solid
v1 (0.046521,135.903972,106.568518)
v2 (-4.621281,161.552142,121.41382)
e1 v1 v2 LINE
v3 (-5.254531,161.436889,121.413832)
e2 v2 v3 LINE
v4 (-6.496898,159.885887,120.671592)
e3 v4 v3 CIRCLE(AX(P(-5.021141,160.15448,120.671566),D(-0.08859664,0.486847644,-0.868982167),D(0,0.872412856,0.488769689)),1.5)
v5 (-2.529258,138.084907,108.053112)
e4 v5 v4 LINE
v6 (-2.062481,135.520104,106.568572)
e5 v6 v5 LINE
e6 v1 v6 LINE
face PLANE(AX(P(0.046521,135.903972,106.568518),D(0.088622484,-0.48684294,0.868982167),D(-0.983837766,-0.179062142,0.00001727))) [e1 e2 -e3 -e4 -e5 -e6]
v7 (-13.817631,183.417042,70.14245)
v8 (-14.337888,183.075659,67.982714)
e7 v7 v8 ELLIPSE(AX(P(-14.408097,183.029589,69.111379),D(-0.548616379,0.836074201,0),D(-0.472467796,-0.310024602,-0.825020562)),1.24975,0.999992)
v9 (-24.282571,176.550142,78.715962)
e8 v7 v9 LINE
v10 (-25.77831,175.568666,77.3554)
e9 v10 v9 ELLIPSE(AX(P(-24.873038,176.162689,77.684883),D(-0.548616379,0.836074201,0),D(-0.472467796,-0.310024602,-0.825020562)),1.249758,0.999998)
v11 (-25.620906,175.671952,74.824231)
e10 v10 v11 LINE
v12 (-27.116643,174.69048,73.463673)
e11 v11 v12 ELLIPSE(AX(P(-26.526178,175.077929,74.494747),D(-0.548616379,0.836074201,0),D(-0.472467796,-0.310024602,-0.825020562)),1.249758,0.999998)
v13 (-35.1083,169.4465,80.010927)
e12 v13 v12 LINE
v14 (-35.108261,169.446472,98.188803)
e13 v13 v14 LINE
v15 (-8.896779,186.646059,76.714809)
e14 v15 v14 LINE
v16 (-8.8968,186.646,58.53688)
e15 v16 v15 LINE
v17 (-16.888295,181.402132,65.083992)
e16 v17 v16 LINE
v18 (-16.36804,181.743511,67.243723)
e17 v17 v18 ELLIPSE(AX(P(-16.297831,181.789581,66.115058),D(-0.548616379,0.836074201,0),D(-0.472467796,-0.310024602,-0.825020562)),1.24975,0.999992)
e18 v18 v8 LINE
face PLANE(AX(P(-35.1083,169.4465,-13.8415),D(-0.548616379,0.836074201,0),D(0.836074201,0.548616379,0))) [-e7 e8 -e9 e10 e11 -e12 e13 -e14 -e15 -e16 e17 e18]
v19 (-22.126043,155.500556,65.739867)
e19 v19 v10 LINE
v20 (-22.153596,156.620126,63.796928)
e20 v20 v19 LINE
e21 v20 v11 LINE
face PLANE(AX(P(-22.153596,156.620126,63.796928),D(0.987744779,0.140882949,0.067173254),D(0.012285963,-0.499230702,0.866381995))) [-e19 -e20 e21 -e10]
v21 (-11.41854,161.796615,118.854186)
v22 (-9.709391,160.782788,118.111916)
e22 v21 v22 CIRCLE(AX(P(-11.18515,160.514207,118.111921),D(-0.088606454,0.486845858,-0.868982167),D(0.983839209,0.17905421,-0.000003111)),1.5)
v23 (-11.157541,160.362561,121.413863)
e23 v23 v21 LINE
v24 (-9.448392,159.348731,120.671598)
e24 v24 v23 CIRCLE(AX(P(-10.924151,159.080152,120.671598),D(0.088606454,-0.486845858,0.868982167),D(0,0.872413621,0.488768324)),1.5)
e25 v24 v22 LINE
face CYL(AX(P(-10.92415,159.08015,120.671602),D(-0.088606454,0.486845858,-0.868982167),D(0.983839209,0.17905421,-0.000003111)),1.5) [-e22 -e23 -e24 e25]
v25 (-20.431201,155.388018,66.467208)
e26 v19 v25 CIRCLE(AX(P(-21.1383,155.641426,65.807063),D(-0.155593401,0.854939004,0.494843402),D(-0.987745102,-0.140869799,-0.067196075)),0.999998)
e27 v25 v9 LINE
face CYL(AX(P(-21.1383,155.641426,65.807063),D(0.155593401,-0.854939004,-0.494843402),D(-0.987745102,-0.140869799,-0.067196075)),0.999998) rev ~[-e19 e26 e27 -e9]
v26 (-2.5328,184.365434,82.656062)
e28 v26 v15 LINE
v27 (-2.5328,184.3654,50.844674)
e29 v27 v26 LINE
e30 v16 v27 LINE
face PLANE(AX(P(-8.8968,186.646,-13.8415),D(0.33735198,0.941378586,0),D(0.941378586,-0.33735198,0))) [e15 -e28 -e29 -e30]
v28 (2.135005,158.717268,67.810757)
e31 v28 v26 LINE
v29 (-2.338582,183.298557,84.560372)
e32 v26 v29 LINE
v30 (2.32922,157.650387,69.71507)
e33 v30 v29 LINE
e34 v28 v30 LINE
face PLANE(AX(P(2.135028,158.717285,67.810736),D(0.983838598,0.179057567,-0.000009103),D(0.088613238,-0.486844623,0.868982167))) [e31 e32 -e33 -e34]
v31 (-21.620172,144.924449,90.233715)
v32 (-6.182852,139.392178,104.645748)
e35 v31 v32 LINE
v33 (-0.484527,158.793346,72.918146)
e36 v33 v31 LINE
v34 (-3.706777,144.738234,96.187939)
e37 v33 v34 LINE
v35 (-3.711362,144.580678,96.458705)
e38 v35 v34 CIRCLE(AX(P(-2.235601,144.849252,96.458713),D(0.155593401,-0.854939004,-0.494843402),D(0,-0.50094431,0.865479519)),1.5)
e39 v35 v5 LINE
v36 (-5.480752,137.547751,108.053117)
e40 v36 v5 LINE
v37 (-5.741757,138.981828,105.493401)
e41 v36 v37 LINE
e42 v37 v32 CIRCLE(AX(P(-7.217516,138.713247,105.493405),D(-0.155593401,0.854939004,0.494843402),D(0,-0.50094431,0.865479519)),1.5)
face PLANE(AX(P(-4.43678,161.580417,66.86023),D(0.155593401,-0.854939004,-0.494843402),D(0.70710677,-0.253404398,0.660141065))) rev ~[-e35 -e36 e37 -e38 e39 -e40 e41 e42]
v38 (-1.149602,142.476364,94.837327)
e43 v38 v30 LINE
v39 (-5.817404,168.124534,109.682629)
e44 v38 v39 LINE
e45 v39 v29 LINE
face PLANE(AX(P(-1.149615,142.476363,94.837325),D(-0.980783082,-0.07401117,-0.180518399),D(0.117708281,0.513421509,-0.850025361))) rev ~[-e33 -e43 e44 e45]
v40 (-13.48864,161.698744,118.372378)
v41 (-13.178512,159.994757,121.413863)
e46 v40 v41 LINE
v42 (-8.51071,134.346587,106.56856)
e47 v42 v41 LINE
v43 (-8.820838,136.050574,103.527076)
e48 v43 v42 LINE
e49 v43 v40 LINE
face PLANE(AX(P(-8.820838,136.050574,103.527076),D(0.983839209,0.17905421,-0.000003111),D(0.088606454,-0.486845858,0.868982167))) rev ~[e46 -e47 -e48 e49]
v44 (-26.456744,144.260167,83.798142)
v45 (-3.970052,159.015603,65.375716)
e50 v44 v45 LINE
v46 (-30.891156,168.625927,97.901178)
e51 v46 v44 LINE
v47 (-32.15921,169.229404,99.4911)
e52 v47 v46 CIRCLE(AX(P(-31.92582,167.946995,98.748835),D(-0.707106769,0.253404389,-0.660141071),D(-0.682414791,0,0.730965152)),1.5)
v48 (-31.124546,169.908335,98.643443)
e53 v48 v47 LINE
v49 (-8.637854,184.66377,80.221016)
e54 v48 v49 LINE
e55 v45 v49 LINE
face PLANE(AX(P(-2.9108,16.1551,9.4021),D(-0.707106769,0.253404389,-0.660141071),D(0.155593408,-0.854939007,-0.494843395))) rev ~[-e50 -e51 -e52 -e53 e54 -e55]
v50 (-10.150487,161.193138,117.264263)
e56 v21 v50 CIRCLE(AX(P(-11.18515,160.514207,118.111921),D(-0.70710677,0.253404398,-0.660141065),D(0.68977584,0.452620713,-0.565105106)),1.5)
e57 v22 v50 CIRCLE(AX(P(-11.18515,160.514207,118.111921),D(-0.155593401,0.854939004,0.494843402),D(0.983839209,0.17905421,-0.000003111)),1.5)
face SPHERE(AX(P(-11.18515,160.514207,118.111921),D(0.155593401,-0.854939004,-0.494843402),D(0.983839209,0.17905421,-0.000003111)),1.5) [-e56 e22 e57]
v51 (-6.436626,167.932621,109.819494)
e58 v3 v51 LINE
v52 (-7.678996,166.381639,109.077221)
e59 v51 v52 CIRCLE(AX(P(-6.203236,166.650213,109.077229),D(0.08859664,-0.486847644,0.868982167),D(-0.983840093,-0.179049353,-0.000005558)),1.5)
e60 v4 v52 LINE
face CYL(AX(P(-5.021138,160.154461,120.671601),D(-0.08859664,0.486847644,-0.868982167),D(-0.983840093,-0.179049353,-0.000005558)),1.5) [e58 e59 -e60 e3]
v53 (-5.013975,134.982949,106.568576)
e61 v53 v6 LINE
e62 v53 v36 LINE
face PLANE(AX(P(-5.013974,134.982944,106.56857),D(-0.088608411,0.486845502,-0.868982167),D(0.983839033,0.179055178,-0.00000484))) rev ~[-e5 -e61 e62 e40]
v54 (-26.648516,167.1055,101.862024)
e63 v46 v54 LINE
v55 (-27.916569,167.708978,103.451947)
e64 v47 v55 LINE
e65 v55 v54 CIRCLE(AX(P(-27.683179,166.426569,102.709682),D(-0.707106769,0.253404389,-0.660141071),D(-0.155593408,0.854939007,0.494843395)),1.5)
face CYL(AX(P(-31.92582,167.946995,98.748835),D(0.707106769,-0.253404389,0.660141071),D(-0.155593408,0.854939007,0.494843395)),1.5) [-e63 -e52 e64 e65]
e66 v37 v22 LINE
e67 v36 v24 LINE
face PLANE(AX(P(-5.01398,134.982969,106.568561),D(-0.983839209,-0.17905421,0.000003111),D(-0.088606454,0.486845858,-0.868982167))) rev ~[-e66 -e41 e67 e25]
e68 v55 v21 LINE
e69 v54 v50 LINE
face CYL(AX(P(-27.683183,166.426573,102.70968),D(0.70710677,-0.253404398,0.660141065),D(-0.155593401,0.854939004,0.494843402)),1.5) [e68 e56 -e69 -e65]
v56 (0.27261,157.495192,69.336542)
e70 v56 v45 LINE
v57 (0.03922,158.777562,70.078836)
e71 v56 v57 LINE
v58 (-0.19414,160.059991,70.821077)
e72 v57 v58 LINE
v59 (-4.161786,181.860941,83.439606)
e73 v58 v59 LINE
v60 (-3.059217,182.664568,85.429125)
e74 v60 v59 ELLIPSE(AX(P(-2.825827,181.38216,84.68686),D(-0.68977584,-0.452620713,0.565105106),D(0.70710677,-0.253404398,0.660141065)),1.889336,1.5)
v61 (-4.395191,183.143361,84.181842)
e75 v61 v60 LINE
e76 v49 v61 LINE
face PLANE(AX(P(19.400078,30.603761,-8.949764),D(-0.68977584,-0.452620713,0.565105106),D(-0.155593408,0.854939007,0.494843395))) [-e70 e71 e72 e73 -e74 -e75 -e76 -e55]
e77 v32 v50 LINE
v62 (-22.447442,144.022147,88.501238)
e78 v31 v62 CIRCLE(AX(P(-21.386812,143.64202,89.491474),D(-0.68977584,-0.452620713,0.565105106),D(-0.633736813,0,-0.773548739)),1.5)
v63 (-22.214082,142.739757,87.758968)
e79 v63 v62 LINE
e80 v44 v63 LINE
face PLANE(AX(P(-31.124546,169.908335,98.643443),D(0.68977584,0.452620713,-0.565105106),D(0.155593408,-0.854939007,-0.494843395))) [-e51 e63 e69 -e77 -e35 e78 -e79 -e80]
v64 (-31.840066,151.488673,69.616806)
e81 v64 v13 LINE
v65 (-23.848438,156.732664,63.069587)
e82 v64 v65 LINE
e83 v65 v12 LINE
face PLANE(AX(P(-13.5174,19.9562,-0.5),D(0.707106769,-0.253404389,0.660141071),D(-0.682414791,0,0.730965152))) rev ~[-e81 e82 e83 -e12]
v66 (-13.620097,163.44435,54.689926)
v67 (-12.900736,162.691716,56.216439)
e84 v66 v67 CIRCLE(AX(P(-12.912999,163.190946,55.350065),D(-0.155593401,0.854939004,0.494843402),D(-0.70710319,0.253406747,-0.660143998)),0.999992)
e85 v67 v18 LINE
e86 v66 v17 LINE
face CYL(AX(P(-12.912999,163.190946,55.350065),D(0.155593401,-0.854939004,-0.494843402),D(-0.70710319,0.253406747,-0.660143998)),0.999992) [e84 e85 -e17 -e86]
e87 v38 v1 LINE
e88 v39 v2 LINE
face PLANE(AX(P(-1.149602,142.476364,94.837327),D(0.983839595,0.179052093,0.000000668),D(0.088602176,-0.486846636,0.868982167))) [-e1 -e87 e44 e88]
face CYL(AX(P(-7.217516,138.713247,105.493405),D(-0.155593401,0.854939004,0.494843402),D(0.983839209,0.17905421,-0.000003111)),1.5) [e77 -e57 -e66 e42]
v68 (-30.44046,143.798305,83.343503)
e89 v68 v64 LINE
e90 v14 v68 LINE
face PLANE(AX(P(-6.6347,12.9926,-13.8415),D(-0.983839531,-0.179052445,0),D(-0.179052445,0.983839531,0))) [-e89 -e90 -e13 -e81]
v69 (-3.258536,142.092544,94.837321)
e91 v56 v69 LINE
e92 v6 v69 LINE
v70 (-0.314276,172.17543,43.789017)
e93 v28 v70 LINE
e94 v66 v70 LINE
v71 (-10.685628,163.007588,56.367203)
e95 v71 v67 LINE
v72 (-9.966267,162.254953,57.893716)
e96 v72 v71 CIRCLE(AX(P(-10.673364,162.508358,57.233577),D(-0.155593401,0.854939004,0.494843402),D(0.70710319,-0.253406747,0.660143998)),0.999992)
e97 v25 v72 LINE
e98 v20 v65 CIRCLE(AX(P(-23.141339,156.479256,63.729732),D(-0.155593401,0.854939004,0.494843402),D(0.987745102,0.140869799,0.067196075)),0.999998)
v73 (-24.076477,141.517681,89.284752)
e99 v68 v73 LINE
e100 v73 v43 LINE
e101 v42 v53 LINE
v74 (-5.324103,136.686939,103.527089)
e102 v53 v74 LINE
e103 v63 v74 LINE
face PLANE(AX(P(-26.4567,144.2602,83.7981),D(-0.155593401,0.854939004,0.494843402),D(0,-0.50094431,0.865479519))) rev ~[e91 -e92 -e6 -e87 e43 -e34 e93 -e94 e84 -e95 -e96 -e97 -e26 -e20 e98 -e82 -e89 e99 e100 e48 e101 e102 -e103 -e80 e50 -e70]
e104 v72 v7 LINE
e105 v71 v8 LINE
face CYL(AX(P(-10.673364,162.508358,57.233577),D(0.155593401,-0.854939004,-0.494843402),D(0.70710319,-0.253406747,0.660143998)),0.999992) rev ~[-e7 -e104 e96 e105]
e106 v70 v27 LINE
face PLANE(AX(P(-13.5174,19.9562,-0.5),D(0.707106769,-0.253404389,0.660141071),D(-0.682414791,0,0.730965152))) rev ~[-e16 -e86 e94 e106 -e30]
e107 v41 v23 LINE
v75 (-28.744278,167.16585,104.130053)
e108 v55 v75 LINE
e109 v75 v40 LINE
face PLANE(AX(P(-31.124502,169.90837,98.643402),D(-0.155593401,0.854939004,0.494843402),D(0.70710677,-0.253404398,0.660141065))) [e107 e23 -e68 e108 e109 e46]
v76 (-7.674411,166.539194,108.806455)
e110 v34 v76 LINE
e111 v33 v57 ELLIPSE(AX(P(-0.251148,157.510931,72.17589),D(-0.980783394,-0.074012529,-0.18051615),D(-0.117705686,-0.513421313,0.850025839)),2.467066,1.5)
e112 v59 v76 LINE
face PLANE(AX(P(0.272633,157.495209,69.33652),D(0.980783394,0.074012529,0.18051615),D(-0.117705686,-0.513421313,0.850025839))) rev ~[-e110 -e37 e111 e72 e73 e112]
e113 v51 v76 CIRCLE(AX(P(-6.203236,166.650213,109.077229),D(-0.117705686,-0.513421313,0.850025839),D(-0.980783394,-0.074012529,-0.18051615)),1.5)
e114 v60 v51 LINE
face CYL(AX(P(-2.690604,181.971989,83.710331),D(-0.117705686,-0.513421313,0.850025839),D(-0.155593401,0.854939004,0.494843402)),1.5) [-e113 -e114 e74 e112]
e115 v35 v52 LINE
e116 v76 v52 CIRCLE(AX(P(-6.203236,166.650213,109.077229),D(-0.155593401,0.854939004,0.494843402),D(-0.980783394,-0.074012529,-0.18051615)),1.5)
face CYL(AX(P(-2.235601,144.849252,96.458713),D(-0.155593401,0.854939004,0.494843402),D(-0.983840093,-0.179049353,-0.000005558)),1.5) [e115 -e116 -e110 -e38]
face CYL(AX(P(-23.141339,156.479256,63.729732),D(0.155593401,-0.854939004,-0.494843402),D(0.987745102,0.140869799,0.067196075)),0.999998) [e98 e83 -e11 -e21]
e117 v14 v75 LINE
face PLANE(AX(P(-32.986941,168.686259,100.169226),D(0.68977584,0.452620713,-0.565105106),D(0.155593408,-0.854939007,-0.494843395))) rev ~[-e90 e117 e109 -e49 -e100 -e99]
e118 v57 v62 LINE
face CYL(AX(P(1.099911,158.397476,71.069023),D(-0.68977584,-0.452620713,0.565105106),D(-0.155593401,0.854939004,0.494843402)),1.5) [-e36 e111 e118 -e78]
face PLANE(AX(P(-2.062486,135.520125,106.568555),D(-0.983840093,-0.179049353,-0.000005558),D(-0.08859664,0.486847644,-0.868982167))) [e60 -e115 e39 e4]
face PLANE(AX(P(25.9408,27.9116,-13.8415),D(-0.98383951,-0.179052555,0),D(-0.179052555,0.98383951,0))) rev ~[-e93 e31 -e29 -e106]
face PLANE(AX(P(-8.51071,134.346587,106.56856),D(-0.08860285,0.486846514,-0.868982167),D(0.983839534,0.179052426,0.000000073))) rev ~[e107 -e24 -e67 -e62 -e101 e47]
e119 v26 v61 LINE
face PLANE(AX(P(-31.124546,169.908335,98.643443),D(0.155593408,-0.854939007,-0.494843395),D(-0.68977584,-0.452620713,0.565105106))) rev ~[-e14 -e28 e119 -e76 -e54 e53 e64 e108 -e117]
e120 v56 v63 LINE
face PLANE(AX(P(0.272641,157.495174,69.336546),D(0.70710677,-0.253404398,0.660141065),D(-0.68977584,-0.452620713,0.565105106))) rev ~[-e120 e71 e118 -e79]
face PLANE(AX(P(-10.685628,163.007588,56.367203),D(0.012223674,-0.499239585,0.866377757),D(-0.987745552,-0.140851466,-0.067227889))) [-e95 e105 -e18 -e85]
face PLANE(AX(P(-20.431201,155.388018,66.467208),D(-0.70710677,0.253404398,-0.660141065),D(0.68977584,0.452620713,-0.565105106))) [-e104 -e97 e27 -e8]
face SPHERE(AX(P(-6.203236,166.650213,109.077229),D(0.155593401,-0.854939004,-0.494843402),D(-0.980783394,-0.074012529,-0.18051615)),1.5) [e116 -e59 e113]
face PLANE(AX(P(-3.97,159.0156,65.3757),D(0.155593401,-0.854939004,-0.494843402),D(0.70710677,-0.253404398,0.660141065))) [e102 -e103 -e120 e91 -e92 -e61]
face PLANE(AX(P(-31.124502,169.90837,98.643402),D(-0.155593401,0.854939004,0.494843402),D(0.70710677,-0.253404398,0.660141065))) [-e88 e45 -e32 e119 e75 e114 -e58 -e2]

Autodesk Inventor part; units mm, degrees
sketch3d "3D Sketch1"
ref_plane "Work Plane1" through (-0.0056, 14.7303, 11.9873) normal (-1, 0, 0) x (0, 0, -1)
ref_plane "Work Plane2" through (-2.9108, 16.1551, 9.4021) normal (-0.7071068, 0.2534044, -0.6601411) x (0.1555934, -0.854939, -0.4948434)
sketch "Sketch2" plane through (-2.9108, 16.1551, 9.4021) normal (-0.7071068, 0.2534044, -0.6601411) x (0.1555934, -0.854939, -0.4948434)
  line L0 (-180, 0) -> (0, 0)
  line L1 (0, 0) -> (0, -32)
  line L2 (0, -32) -> (-180, -32)
  line L3 (-180, -32) -> (-180, 0)
  line L4 (3, -35) -> (-180, -35)
  line L5 (-180, -35) -> (-180, 3)
  line L6 (-180, 3) -> (3, 3)
  line L7 (3, 3) -> (3, -35)
  line L8 (-180, 0.3) -> (0.2, 0.3)
  line L9 (0.2, 0.3) -> (0.2, -32.3)
  line L10 (0.2, -32.3) -> (-180, -32.3)
  line L11 (-180, -32.3) -> (-180, 0.3)
  point P0 (-180, 0)
  dimension "d1" = 180
  dimension "d2" = 32
  dimension "d5" = 3
  dimension "d6" = 3
  dimension "d7" = 3
  dimension "d13" = 0.2
  dimension "d14" = 0.3
  dimension "d15" = 0.3
extrude "Extrusion1" add sketch "Sketch2" along normal blind 3
extrude "Extrusion3" add sketch "Sketch2" against normal blind 6 contours L5 L6 L7 L4 L10 L9 L8
ref_plane "Work Plane3" through (19.5768, 30.1922, -13.8415) normal (0, 0, 1) x (1, 0, 0)
sketch "Sketch4" plane through (-3.0866, 15.8483, 9.4727) normal (-0.1555934, 0.854939, 0.4948434) x (0.7071068, -0.2534044, 0.6601411)
  line L0 (0, 0) -> (0, 32.6) projected
  line L1 (0, 0) -> (6, 0) projected
  line L2 (6, 32.6) -> (6, 0) projected
  line L3 (0, 32.6) -> (6, 32.6) projected
  line L4 (5, 32.6) -> (6, 32.0226)
  point P0 (-0.0547, 0.3088)
  dimension "d18" = 5
  dimension "d20" = 30
extrude "Extrusion4" [suppressed]
sketch "Sketch5" plane through (19.5768, 30.1922, -13.8415) normal (0, 0, 1) x (1, 0, 0)
  line L0 (-26.2115, -17.1996) -> (-54.6851, 139.2543) projected
  line L1 (-19.8475, -19.4802) -> (-26.2115, -17.1996) projected
  line L2 (-19.8475, -19.4802) -> (6.364, -2.2806) projected
  line L3 (6.364, -2.2806) -> (-22.1096, 154.1732) projected
  line L4 (-54.6851, 139.2543) -> (-28.4736, 156.4538) projected
  line L5 (-28.4736, 156.4538) -> (-22.1096, 154.1732) projected
  point P0 (-19.5768, -30.1922)
extrude "Extrusion5" add sketch "Sketch5" along normal up to next
sketch "Sketch6" plane through (-2.9108, 16.1551, 9.4021) normal (0.7071068, -0.2534044, 0.6601411) x (0.6897758, 0.4526207, -0.5651051)
  line L0 (13.5, 135.3) -> (29, 135.3)
  line L1 (13.5, 109.3) -> (13.5, 135.3)
  line L2 (11.5, 109.3) -> (13.5, 109.3)
  line L3 (11.5, 77.3) -> (11.5, 109.3)
  line L4 (9.5, 77.3) -> (11.5, 77.3)
  line L5 (9.5, 45.3) -> (9.5, 77.3)
  line L6 (6.25, 45.3) -> (9.5, 45.3)
  line L7 (6.25, 2.8) -> (6.25, 45.3)
  line L8 (29, 2.8) -> (6.25, 2.8)
  line L9 (29, 135.3) -> (29, 2.8)
  line L10 (32, 0) -> (32, 180) projected
  line L11 (0, 0) -> (32, 0) projected
  line L12 (32.3, 180) -> (32.3, -0.2) projected
  line L13 (32.3, -0.2) -> (29, -0.2)
  line L14 (29, -0.2) -> (29, 2.8)
  line L15 (29, 2.8) -> (32.3, 2.8)
  line L16 (32.3, 2.8) -> (32.3, -0.2)
  point P0 (0.0088, -18.9171)
  dimension "d25" = 3
  dimension "d26" = 3.3
sketch "Sketch8" plane through (19.5768, 30.1922, -13.8415) normal (0, 0, -1) x (-1, 0, 0)
  line L0 (0.1767, 0.4115) -> (28.2147, 154.4716) projected
  line L1 (50.7014, 139.7161) -> (28.2147, 154.4716) projected
  line L2 (50.7014, 139.7161) -> (22.6634, -14.3439) projected
  line L3 (22.6634, -14.3439) -> (0.1767, 0.4115) projected
  line L4 (18.6122, -8.8144) -> (25.2249, 27.5205) projected
  line L5 (2.9198, 1.4827) -> (18.6122, -8.8144) projected
  line L6 (23.5359, 114.7621) -> (2.9198, 1.4827) projected
  line L7 (25.2249, 27.5205) -> (22.9831, 28.9915) projected
  line L8 (22.9831, 28.9915) -> (27.9621, 56.3496) projected
  line L9 (26.5826, 57.2548) -> (31.5615, 84.6129) projected
  line L10 (27.9621, 56.3496) -> (26.5826, 57.2548) projected
  line L11 (30.182, 85.5181) -> (34.2274, 107.7465) projected
  line L12 (31.5615, 84.6129) -> (30.182, 85.5181) projected
  line L13 (34.2274, 107.7465) -> (23.5359, 114.7621) projected
  line L14 (26.6416, 26.5909) -> (9.5325, 37.8176)
  line L15 (9.5325, 37.8176) -> (7.338, 34.4733)
  line L16 (7.338, 34.4733) -> (24.4471, 23.2466)
  line L17 (24.4471, 23.2466) -> (26.6416, 26.5909)
  line L18 (29.3788, 55.42) -> (27.1843, 52.0757)
  line L19 (27.1843, 52.0757) -> (12.317, 61.8314)
  line L20 (12.317, 61.8314) -> (14.5115, 65.1757)
  line L21 (14.5115, 65.1757) -> (29.3788, 55.42)
  line L22 (32.9782, 83.6833) -> (30.7837, 80.339)
  line L23 (30.7837, 80.339) -> (17.296, 89.1894)
  line L24 (17.296, 89.1894) -> (19.4905, 92.5337)
  line L25 (19.4905, 92.5337) -> (32.9782, 83.6833)
  point P0 (19.5768, -30.1922)
  point P1 (18.7127, 88.2598)
  point P2 (13.7337, 60.9018)
  point P3 (8.7547, 33.5437)
  dimension "d27" = 4
  dimension "d28" = 4
  dimension "d29" = 4
extrude "Extrusion6" cut sketch "Sketch8" against normal through all contours L5 L6 L16 L4 | L14 L6 L19 L8 | L6 L23 L9 L21 | L6 L13 L11 L25
ref_plane "Work Plane4" through (-13.5174, 19.9562, -0.5) normal (0.7071068, -0.2534044, 0.6601411) x (0.6897758, 0.4526207, -0.5651051)
ref_plane "Work Plane6" through (-26.4567, 144.2602, 83.7981) normal (-0.1555934, 0.854939, 0.4948434) x (0.7071068, -0.2534044, 0.6601411)
split body "Split1" result two bodies by plane through (-26.4567, 144.2602, 83.7981) normal (-0.1555934, 0.854939, 0.4948434) first body at (-13.9482, 171.37, 41.9041)
split body "Split2" result two bodies by plane through (-13.5174, 19.9562, -0.5) normal (0.7071068, -0.2534044, 0.6601411) bodies 2 first body at (-22.4266, 166.4041, 87.2241)
sketch "Sketch9" plane through (-26.4567, 144.2602, 83.7981) normal (-0.1555934, 0.854939, 0.4948434) x (0.7071068, -0.2534044, 0.6601411)
  line L0 (-15, 7.5724) -> (-15, 45.5724) projected
  line L1 (-13.2929, 19.8653) -> (-11.7071, 18.2796)
  line L2 (-10, 18.9867) -> (-10, 34.1582)
  line L3 (-11.7071, 34.8653) -> (-13.2929, 33.2796)
  arc A0 (-11.7071, 18.2796) -> (-10, 18.9867) centre (-11, 18.9867) ccw
  arc A1 (-10, 34.1582) -> (-11.7071, 34.8653) centre (-11, 34.1582) ccw
  line L4 (-15, 7.5724) -> (-15, 45.5724) projected
  line L5 (-15, 7.5724) -> (-3, -2.7) projected
  line L6 (-3, -2.7) -> (-3, 35.3) projected
  line L7 (-15, 45.5724) -> (-3, 35.3) projected
  line L8 (-15, 45.5724) -> (-15, 53.2768) projected
  line L9 (-15, 45.5724) -> (-3, 35.3) projected
  line L10 (-3, 35.3) -> (6, 35.3) projected
  line L11 (-15, 53.2768) -> (6, 35.3) projected
  line L12 (0, 0) -> (0, 32.6) projected
  line L13 (0, 32.6) -> (6, 32.6) projected
  line L14 (6, 35.3) -> (6, 32.6) projected
  line L15 (-3, 35.3) -> (6, 35.3) projected
  line L16 (-3, -2.7) -> (-3, 35.3) projected
  line L17 (6, -2.7) -> (-3, -2.7) projected
  line L18 (6, 0) -> (6, -2.7) projected
  line L19 (0, 0) -> (6, 0) projected
  line L20 (-15, 45.5724) -> (-15, 53.2768) projected
  line L21 (-34.0212, 69.5596) -> (-15, 53.2768) projected
  line L22 (-15, 33.9867) -> (-15, 53.2768)
  line L23 (-15, 19.1582) -> (-15, 7.5724)
  arc A2 (-13.2929, 19.8653) -> (-15, 19.1582) centre (-14, 19.1582) ccw
  arc A3 (-15, 33.9867) -> (-13.2929, 33.2796) centre (-14, 33.9867) ccw
  line L24 (-15.3, 53.5336) -> (-15.3, 33.9867)
  arc A4 (-15.3, 33.9867) -> (-13.0808, 33.0674) centre (-14, 33.9867) ccw
  line L25 (-13.0808, 33.0674) -> (-11.495, 34.6532)
  arc A5 (-10.3, 34.1582) -> (-11.495, 34.6532) centre (-11, 34.1582) ccw
  line L26 (-10.3, 34.1582) -> (-10.3, 18.9867)
  arc A6 (-11.495, 18.4917) -> (-10.3, 18.9867) centre (-11, 18.9867) ccw
  line L27 (-11.495, 18.4917) -> (-13.0808, 20.0775)
  arc A7 (-13.0808, 20.0775) -> (-15.3, 19.1582) centre (-14, 19.1582) ccw
  line L28 (-15.3, 19.1582) -> (-15.3, 7.8293)
  line L29 (-43.0212, 31.5596) -> (-15, 7.5724) projected
  point P0 (-0.0547, 0.3088)
  point P1 (-15, 21.5724)
  point P2 (-10, 16.5724)
  point P3 (-10, 36.5724)
  point P4 (-15, 31.5724)
  point P5 (-15, 33.9867)
  point P6 (-15, 45.5724)
  point P7 (-15, 33.156)
  point P8 (-15, 19.9889)
  dimension "d35" = 45
  dimension "d36" = 45
  dimension "d37" = 20
  dimension "d38" = 5
  dimension "d40" = 10
  dimension "d41" = 38
  dimension "d42" = 14
  dimension "d47" = 1
  dimension "d48" = 1
  dimension "d49" = 0.3
extrude "Extrusion7" cut sketch "Sketch9" along normal through all contours L29 L28 A7 L0 | L0 A7 L27 A6 L26 A5 L25 A4 A3 L3 A1 L2 A0 L1 A2 | A4 L24 L21 L8 L0 bodies 4 5
sketch "Sketch11" plane through (-26.4567, 144.2602, 83.7981) normal (-0.1555934, 0.854939, 0.4948434) x (0.7071068, -0.2534044, 0.6601411)
  line L0 (34.4958, 0.0029) -> (24.2403, 8.7821)
  line L1 (24.2403, 8.7821) -> (25.6343, 10.4105)
  line L2 (25.6343, 10.4105) -> (35.8898, 1.6314)
  line L3 (35.8898, 1.6314) -> (34.4958, 0.0029)
  line L4 (32.5449, -2.2761) -> (29.886, 0)
  line L5 (29.886, 0) -> (27.5747, -2.7)
  line L6 (27.5747, -2.7) -> (30.2336, -4.9761)
  line L7 (30.2336, -4.9761) -> (32.5449, -2.2761)
  line L8 (34.4958, 0.0029) -> (32.5449, -2.2761)
  line L9 (-11.495, 18.4917) -> (-13.0808, 20.0775) projected
  arc A0 (-15, 19.9889) -> (-15.3, 19.1582) centre (-14, 19.1582) ccw projected
  line L10 (-15, 33.156) -> (-15, 19.9889) projected
  arc A1 (-15.3, 33.9867) -> (-15, 33.156) centre (-14, 33.9867) ccw projected
  line L11 (-13.0808, 33.0674) -> (-11.495, 34.6532) projected
  arc A2 (-10.3, 34.1582) -> (-11.495, 34.6532) centre (-11, 34.1582) ccw projected
  line L12 (-10.3, 34.1582) -> (-10.3, 18.9867) projected
  arc A3 (-11.495, 18.4917) -> (-10.3, 18.9867) centre (-11, 18.9867) ccw projected
  line L13 (6, -2.7) -> (-3, -2.7) projected
  line L14 (-3, -2.7) -> (-43.0212, 31.5596) projected
  line L15 (-15, 7.5724) -> (-15, 19.1582) projected
  arc A4 (-13.2929, 19.8653) -> (-15, 19.1582) centre (-14, 19.1582) ccw projected
  line L16 (-13.2929, 19.8653) -> (-11.7071, 18.2796) projected
  arc A5 (-11.7071, 18.2796) -> (-10, 18.9867) centre (-11, 18.9867) ccw projected
  line L17 (-10, 18.9867) -> (-10, 34.1582) projected
  arc A6 (-10, 34.1582) -> (-11.7071, 34.8653) centre (-11, 34.1582) ccw projected
  line L18 (-11.7071, 34.8653) -> (-13.2929, 33.2796) projected
  arc A7 (-15, 33.9867) -> (-13.2929, 33.2796) centre (-14, 33.9867) ccw projected
  line L19 (-15, 33.9867) -> (-15, 53.2768) projected
  line L20 (-34.0212, 69.5596) -> (6, 35.3) projected
  line L21 (6, 35.3) -> (6, 32.6) projected
  line L22 (6, 32.6) -> (0, 32.6) projected
  line L23 (0, 32.6) -> (0, 0) projected
  line L24 (0, 0) -> (6, 0) projected
  line L25 (6, 0) -> (6, -2.7) projected
  line L26 (-15.3, 19.1582) -> (-15.3, 7.8293) projected
  line L27 (-15.3, 53.5336) -> (-15.3, 33.9867) projected
  line L28 (-3, 35.3) -> (6, 35.3) projected
  line L29 (0, 32.6) -> (6, 32.6) projected
  line L30 (0, 0) -> (0, 32.6) projected
  line L31 (-3, -2.7) -> (-3, 35.3) projected
  line L32 (6, 35.3) -> (6, 32.6) projected
  line L33 (6, -2.7) -> (-3, -2.7) projected
  line L34 (6, 0) -> (6, -2.7) projected
  line L35 (0, 0) -> (6, 0) projected
  line L36 (6, 35.3) -> (6, 32.6) projected
  line L37 (-15.3, 53.5336) -> (6, 35.3) projected
  line L38 (-15, 53.2768) -> (6, 35.3) projected
  line L39 (24.2403, 8.7821) -> (25.905, 10.057)
  line L40 (25.905, 10.057) -> (7.6648, 33.8749)
  line L41 (7.6648, 33.8749) -> (6, 32.6)
  line L42 (6, 32.6) -> (24.2403, 8.7821)
  line L43 (6, 35.3) -> (7.6648, 33.8749)
  line L44 (6, -2.7) -> (27.5747, -2.7)
  line L45 (6, 0) -> (29.886, 0)
  line L46 (24.2403, 8.7821) -> (6, 24.3964) construction
  line L47 (6, 32.6) -> (6, 0) construction
  line L48 (6, 35.3) -> (6, 32.6)
  line L49 (6, 0) -> (6, -2.7) projected
  line L50 (6, 0) -> (6, -2.7)
  line L51 (6, 35.3) -> (6, 32.6) projected
  arc A8 (-13.0808, 20.0775) -> (-15, 19.9889) centre (-14, 19.1582) ccw projected
  arc A9 (-15, 33.156) -> (-13.0808, 33.0674) centre (-14, 33.9867) ccw projected
  line L52 (-15.3, 7.8293) -> (-43.0212, 31.5596) projected
  line L53 (-34.0212, 69.5596) -> (-15.3, 53.5336) projected
  line L54 (-43.0212, 31.5596) -> (-43.0212, 69.5596) projected
  line L55 (-43.0212, 69.5596) -> (-34.0212, 69.5596) projected
  point P0 (-0.0547, 0.3088)
  dimension "d63" = 3
  dimension "d64" = 3.5
  dimension "d65" = 13.5
  dimension "d66" = 30
  dimension "d67" = 24.0107
extrude "Extrusion8" add sketch "Sketch11" along normal up to surface (30 mm away) contours L0 L39 L40 L2 L3 | L42 L41 L40 L1 | L1 L40 L39 | L7 L6 L5 L4 | L21 L43 L41 | L5 L44 L25 L45 bodies 4
sketch "Sketch12" plane through (-3.97, 159.0156, 65.3757) normal (0.1555934, -0.854939, -0.4948434) x (0.7071068, -0.2534044, 0.6601411)
  arc A0 (-15, 13.4418) -> (-13.2929, 12.7347) centre (-14, 13.4418) ccw projected
  line L0 (-13.2929, 12.7347) -> (-11.7071, 14.3204) projected
  arc A1 (-10, 13.6133) -> (-11.7071, 14.3204) centre (-11, 13.6133) ccw projected
  line L1 (-10, 13.6133) -> (-10, -1.5582) projected
  arc A2 (-11.7071, -2.2653) -> (-10, -1.5582) centre (-11, -1.5582) ccw projected
  line L2 (-11.7071, -2.2653) -> (-13.2929, -0.6796) projected
  arc A3 (-13.2929, -0.6796) -> (-15, -1.3867) centre (-14, -1.3867) ccw projected
  line L3 (-15, -20.6768) -> (-15, -1.3867) projected
  line L4 (-15, -20.6768) -> (7.6648, -1.2749) projected
  line L5 (25.6343, 22.1895) -> (7.6648, -1.2749) projected
  line L6 (35.8898, 30.9686) -> (25.6343, 22.1895) projected
  line L7 (34.4958, 32.5971) -> (35.8898, 30.9686) projected
  line L8 (24.2403, 23.8179) -> (34.4958, 32.5971) projected
  line L9 (6, 0) -> (24.2403, 23.8179) projected
  line L10 (6, 0) -> (0, 0) projected
  line L11 (0, 0) -> (0, 32.6) projected
  line L12 (0, 32.6) -> (29.886, 32.6) projected
  line L13 (32.5449, 34.8761) -> (29.886, 32.6) projected
  line L14 (30.2336, 37.5761) -> (32.5449, 34.8761) projected
  line L15 (27.5747, 35.3) -> (30.2336, 37.5761) projected
  line L16 (27.5747, 35.3) -> (-3, 35.3) projected
  line L17 (-3, 35.3) -> (-15, 25.0276) projected
  line L18 (-15, 13.4418) -> (-15, 25.0276) projected
  line L19 (30.2336, 37.5761) -> (35.8898, 30.9686)
  line L20 (6, 0) -> (6, 32.6)
  point P0 (-0.0547, 32.2912)
  point P1 (34.4958, 32.5971)
  point P2 (32.5449, 34.8761)
  point P3 (34.4958, 32.5971)
  point P4 (32.5449, 34.8761)
extrude "Extrusion9" add sketch "Sketch12" against normal blind 3 contours L19 L8 L9 L20 L12 L13 bodies 4
combine bodies "Combine2" operation type add bodies to combine 5 3
fillet "Fillet1" radius 1.5 7 edges at (-7.3283, 164.4545, 115.5483) (-9.8368, 161.4831, 119.8932) (-20.5582, 166.1217, 108.508) (-7.8914, 150.7934, 111.6921) (-5.8259, 156.199, 103.0022) (-6.1608, 175.442, 96.9323) (-11.4375, 152.6823, 80.0323)
delete faces "Delete Face1" heal no whole lump yes faces at (-24.2286, 169.0466, 72.7125)
delete faces "Delete Face2" heal no whole lump yes faces at (-28.8209, 166.9431, 71.8608)
equation "\"d15\" = d14"
equation "\"d28\" = d27"
equation "\"d29\" = d28"
equation "\"d42\" = -0.5 * d40 + 0.5 * d41"
equation "\"d49\" = doveTailTolerance"
equation "\"doveTailTolerance\" = 0.3"
properties part number "coinDropper"
